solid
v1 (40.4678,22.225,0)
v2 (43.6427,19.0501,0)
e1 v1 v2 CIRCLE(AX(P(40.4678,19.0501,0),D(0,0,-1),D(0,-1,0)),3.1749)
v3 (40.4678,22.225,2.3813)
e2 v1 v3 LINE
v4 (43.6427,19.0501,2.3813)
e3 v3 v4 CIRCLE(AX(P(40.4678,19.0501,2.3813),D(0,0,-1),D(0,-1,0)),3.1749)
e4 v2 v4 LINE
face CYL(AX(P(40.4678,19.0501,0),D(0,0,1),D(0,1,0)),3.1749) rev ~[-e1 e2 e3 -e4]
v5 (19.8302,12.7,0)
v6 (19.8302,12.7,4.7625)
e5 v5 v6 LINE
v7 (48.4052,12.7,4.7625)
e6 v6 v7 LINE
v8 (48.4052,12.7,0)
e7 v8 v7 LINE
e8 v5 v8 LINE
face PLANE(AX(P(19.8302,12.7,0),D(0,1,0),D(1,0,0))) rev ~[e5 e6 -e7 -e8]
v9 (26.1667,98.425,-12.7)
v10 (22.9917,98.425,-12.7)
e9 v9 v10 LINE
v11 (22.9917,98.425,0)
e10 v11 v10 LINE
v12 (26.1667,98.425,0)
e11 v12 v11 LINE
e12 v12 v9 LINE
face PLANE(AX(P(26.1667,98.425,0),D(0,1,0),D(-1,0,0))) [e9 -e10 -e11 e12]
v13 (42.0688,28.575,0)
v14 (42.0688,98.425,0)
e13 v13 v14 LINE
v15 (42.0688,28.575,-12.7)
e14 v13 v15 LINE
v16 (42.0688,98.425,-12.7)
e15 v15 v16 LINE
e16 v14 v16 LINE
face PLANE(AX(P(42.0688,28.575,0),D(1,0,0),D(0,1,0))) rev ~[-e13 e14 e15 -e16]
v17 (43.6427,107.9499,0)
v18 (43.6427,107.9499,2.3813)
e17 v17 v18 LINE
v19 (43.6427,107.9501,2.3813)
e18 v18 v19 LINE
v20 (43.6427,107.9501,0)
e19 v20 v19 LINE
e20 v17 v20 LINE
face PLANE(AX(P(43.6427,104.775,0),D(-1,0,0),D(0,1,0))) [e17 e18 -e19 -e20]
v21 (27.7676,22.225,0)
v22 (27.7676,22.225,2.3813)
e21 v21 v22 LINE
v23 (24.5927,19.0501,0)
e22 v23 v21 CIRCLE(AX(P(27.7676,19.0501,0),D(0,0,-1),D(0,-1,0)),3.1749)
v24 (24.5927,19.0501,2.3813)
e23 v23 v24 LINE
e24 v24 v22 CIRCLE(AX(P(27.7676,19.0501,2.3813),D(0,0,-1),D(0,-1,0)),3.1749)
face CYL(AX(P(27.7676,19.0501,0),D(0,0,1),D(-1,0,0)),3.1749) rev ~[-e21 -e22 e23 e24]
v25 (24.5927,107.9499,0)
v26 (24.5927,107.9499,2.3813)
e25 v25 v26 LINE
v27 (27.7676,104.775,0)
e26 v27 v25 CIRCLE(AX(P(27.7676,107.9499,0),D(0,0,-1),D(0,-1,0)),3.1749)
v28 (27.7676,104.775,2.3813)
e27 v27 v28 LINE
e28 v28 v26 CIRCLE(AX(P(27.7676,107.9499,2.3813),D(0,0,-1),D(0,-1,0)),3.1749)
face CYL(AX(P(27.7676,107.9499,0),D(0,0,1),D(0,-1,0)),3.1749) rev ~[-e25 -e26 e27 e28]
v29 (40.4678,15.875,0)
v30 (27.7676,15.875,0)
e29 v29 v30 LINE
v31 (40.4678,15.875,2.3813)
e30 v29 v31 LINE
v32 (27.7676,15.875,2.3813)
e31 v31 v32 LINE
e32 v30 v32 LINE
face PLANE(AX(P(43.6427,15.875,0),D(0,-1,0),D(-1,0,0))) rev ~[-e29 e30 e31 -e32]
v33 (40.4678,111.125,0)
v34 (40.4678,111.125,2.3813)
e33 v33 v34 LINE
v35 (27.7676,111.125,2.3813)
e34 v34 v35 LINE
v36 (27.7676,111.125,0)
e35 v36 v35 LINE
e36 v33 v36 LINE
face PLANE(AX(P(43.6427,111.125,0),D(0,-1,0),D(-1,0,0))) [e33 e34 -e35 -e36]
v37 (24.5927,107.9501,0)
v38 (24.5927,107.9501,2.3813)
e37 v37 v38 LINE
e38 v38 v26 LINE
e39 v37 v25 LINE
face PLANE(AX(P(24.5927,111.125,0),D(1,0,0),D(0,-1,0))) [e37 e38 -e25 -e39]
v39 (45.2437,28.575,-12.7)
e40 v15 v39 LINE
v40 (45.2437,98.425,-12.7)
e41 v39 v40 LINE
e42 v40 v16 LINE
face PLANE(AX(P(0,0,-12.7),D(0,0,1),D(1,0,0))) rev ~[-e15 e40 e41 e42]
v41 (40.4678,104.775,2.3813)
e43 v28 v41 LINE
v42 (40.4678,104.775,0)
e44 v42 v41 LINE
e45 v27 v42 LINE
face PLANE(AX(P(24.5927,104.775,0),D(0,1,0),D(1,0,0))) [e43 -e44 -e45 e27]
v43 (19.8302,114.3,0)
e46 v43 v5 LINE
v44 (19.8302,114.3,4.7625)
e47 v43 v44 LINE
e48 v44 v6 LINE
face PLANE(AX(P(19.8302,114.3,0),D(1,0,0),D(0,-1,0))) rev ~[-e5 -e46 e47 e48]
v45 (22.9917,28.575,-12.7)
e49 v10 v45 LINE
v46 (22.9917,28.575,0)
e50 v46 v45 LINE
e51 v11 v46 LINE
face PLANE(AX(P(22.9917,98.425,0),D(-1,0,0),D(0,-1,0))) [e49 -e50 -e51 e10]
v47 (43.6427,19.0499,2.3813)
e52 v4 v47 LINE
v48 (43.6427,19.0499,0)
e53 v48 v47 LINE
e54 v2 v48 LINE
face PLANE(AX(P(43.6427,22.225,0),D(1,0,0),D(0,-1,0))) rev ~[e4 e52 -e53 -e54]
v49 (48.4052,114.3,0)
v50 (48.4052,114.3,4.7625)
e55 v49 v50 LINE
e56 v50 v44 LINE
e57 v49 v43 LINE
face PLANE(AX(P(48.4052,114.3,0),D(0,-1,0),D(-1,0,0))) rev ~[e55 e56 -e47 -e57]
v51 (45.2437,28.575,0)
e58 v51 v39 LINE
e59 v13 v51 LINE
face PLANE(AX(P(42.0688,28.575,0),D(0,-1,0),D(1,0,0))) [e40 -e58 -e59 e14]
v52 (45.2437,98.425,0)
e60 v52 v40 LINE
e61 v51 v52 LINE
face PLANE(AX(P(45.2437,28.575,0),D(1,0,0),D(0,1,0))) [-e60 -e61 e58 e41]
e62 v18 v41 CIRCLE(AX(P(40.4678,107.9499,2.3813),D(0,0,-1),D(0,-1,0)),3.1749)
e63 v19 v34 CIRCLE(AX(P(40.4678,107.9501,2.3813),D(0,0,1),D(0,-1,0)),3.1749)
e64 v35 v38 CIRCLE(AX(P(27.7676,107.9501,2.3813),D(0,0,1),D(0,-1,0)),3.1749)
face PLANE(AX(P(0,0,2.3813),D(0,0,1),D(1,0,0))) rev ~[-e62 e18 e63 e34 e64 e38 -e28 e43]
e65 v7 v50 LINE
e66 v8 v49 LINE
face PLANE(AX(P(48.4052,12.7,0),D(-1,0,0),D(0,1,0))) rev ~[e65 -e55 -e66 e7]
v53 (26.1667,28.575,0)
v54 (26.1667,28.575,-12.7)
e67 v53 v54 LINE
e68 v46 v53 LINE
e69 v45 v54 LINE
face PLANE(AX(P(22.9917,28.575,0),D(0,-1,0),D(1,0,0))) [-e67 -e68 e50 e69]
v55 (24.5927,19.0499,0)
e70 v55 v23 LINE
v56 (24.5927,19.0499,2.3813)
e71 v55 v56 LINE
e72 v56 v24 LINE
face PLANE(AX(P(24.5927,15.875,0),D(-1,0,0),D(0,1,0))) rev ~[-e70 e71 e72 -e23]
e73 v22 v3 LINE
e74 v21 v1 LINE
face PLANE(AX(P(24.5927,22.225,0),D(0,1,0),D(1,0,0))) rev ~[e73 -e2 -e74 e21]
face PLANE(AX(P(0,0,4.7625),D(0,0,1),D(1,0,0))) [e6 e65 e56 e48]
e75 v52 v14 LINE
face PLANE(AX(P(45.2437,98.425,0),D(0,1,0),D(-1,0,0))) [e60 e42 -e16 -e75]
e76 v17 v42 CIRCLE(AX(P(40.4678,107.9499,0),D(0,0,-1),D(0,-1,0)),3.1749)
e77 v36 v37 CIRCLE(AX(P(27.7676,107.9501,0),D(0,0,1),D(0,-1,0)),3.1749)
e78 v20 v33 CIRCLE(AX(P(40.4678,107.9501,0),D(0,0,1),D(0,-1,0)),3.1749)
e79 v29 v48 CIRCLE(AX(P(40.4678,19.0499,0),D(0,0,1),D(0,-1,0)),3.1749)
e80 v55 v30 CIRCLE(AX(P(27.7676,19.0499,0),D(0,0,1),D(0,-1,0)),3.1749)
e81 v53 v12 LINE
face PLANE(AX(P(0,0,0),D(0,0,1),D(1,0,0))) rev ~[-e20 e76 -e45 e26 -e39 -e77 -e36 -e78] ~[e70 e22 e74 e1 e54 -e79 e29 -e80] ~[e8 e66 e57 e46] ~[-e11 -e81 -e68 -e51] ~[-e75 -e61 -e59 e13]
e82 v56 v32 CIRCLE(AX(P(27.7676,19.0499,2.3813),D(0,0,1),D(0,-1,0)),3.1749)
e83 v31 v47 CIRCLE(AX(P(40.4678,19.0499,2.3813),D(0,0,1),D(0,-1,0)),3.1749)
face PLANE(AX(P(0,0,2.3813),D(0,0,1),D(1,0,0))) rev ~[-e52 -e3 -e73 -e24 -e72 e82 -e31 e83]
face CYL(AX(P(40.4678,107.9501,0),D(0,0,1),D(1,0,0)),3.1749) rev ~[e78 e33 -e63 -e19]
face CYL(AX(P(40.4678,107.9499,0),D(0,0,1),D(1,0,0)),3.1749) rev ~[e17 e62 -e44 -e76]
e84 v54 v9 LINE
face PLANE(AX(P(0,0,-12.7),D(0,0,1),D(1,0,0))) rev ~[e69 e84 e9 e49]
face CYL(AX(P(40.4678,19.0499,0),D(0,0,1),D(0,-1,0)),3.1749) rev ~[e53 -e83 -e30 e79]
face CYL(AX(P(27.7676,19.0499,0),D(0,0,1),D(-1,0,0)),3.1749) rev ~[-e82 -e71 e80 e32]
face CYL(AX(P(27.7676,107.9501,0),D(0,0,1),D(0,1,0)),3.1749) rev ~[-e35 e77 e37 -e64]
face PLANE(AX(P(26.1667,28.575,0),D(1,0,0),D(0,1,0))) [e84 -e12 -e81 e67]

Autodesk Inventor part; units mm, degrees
ref_plane "YZ Plane" through (0, 0, 0) normal (1, 0, 0) x (0, 1, 0)
ref_plane "XZ Plane" through (0, 0, 0) normal (0, 1, 0) x (-1, 0, 0)
ref_plane "XY Plane" through (0, 0, 0) normal (0, 0, 1) x (1, 0, 0)
sketch "Sketch1" plane through (0, 0, 0) normal (0, 0, 1) x (1, 0, 0)
  line L0 (0, 0) -> (50.8, 0) construction
  line L1 (50.8, 0) -> (50.8, 127) construction
  line L2 (50.8, 127) -> (0, 127) construction
  line L3 (0, 127) -> (0, 0) construction
  line L4 (0, 63.5) -> (50.8, 63.5) construction
  line L5 (25.4, 127) -> (25.4, 0) construction
  line L6 (6.7469, 46) -> (44.0531, 46) construction
  line L7 (44.0531, 46) -> (44.0531, 81) construction
  line L8 (44.0531, 81) -> (6.7469, 81) construction
  line L9 (6.7469, 81) -> (6.7469, 46) construction
  line L10 (41.6177, 127) -> (41.6177, 0) construction
  line L11 (26.6177, 127) -> (26.6177, 0) construction
  line L12 (45.2437, 28.575) -> (45.2437, 98.425)
  line L13 (45.2437, 98.425) -> (22.9917, 98.425)
  line L14 (22.9917, 98.425) -> (22.9917, 28.575)
  line L15 (22.9917, 28.575) -> (45.2437, 28.575)
  line L16 (42.0688, 28.575) -> (42.0688, 98.425)
  line L17 (26.1667, 28.575) -> (26.1667, 98.425)
  line L18 (24.5927, 22.225) -> (43.6427, 22.225)
  line L19 (43.6427, 22.225) -> (43.6427, 15.875)
  line L20 (43.6427, 15.875) -> (24.5927, 15.875)
  line L21 (24.5927, 15.875) -> (24.5927, 22.225)
  line L22 (34.1177, 0) -> (34.1177, 127) construction
  line L23 (43.6427, 111.125) -> (24.5927, 111.125)
  line L24 (24.5927, 111.125) -> (24.5927, 104.775)
  line L25 (24.5927, 104.775) -> (43.6427, 104.775)
  line L26 (43.6427, 104.775) -> (43.6427, 111.125)
  line L27 (19.8302, 12.7) -> (48.4052, 12.7)
  line L28 (48.4052, 12.7) -> (48.4052, 114.3)
  line L29 (48.4052, 114.3) -> (19.8302, 114.3)
  line L30 (19.8302, 114.3) -> (19.8302, 12.7)
  dimension "d0" = 50.8
  dimension "d1" = 127
  dimension "d2" = 35
  dimension "d3" = 37.3062
  dimension "d4" = 15
  dimension "d5" = 2.4354
  dimension "d6" = 5.5563
  dimension "d7" = 3.175
  dimension "d8" = 0.451
  dimension "d9" = 0.451
  dimension "d10" = 3.175
  dimension "d11" = 69.85
  dimension "d12" = 19.05
  dimension "d13" = 6.35
  dimension "d14" = 6.35
  dimension "d15" = 6.35
  dimension "d16" = 19.05
  dimension "d17" = 6.35
  dimension "d18" = 3.175
  dimension "d21" = 3.175
  dimension "d30" = 28.575
  dimension "d32" = 3.1615
  dimension "d33" = 3.1615
extrude "Main Cover Profile" add sketch "Sketch1" along normal blind 4.7625 contours L15 L16 L13 L12 | L15 L17 L13 L16 | L15 L14 L13 L17 | L18 L19 L20 L21 | L26 L25 L24 L23 | L30 L29 L28 L27
extrude "Magnet Pockets" cut sketch "Sketch1" along normal blind 2.3813 contours L18 L19 L20 L21 | L26 L25 L24 L23
extrude "Belt Aligning Tabs" add sketch "Sketch1" against normal blind 12.7 contours L15 L16 L13 L12 | L15 L14 L13 L17
fillet "Fillet1" radius 3.175 8 edges at (43.6427, 22.225, 1.1906) (43.6427, 15.875, 1.1906) (24.5927, 15.875, 1.1906) (24.5927, 22.225, 1.1906) (43.6427, 104.775, 1.1906) (43.6427, 111.125, 1.1906) (24.5927, 104.775, 1.1906) (24.5927, 111.125, 1.1906)
equation "\"d5\" = -0.666667 * d4 + 0.333333 * d3"
equation "\"d9\" = d8"
equation "\"d10\" = d7"
equation "\"d12\" = d16"
equation "\"d13\" = d15"
properties part number "Belt Aligner MagLock" material "Polyethylene, High Density"
